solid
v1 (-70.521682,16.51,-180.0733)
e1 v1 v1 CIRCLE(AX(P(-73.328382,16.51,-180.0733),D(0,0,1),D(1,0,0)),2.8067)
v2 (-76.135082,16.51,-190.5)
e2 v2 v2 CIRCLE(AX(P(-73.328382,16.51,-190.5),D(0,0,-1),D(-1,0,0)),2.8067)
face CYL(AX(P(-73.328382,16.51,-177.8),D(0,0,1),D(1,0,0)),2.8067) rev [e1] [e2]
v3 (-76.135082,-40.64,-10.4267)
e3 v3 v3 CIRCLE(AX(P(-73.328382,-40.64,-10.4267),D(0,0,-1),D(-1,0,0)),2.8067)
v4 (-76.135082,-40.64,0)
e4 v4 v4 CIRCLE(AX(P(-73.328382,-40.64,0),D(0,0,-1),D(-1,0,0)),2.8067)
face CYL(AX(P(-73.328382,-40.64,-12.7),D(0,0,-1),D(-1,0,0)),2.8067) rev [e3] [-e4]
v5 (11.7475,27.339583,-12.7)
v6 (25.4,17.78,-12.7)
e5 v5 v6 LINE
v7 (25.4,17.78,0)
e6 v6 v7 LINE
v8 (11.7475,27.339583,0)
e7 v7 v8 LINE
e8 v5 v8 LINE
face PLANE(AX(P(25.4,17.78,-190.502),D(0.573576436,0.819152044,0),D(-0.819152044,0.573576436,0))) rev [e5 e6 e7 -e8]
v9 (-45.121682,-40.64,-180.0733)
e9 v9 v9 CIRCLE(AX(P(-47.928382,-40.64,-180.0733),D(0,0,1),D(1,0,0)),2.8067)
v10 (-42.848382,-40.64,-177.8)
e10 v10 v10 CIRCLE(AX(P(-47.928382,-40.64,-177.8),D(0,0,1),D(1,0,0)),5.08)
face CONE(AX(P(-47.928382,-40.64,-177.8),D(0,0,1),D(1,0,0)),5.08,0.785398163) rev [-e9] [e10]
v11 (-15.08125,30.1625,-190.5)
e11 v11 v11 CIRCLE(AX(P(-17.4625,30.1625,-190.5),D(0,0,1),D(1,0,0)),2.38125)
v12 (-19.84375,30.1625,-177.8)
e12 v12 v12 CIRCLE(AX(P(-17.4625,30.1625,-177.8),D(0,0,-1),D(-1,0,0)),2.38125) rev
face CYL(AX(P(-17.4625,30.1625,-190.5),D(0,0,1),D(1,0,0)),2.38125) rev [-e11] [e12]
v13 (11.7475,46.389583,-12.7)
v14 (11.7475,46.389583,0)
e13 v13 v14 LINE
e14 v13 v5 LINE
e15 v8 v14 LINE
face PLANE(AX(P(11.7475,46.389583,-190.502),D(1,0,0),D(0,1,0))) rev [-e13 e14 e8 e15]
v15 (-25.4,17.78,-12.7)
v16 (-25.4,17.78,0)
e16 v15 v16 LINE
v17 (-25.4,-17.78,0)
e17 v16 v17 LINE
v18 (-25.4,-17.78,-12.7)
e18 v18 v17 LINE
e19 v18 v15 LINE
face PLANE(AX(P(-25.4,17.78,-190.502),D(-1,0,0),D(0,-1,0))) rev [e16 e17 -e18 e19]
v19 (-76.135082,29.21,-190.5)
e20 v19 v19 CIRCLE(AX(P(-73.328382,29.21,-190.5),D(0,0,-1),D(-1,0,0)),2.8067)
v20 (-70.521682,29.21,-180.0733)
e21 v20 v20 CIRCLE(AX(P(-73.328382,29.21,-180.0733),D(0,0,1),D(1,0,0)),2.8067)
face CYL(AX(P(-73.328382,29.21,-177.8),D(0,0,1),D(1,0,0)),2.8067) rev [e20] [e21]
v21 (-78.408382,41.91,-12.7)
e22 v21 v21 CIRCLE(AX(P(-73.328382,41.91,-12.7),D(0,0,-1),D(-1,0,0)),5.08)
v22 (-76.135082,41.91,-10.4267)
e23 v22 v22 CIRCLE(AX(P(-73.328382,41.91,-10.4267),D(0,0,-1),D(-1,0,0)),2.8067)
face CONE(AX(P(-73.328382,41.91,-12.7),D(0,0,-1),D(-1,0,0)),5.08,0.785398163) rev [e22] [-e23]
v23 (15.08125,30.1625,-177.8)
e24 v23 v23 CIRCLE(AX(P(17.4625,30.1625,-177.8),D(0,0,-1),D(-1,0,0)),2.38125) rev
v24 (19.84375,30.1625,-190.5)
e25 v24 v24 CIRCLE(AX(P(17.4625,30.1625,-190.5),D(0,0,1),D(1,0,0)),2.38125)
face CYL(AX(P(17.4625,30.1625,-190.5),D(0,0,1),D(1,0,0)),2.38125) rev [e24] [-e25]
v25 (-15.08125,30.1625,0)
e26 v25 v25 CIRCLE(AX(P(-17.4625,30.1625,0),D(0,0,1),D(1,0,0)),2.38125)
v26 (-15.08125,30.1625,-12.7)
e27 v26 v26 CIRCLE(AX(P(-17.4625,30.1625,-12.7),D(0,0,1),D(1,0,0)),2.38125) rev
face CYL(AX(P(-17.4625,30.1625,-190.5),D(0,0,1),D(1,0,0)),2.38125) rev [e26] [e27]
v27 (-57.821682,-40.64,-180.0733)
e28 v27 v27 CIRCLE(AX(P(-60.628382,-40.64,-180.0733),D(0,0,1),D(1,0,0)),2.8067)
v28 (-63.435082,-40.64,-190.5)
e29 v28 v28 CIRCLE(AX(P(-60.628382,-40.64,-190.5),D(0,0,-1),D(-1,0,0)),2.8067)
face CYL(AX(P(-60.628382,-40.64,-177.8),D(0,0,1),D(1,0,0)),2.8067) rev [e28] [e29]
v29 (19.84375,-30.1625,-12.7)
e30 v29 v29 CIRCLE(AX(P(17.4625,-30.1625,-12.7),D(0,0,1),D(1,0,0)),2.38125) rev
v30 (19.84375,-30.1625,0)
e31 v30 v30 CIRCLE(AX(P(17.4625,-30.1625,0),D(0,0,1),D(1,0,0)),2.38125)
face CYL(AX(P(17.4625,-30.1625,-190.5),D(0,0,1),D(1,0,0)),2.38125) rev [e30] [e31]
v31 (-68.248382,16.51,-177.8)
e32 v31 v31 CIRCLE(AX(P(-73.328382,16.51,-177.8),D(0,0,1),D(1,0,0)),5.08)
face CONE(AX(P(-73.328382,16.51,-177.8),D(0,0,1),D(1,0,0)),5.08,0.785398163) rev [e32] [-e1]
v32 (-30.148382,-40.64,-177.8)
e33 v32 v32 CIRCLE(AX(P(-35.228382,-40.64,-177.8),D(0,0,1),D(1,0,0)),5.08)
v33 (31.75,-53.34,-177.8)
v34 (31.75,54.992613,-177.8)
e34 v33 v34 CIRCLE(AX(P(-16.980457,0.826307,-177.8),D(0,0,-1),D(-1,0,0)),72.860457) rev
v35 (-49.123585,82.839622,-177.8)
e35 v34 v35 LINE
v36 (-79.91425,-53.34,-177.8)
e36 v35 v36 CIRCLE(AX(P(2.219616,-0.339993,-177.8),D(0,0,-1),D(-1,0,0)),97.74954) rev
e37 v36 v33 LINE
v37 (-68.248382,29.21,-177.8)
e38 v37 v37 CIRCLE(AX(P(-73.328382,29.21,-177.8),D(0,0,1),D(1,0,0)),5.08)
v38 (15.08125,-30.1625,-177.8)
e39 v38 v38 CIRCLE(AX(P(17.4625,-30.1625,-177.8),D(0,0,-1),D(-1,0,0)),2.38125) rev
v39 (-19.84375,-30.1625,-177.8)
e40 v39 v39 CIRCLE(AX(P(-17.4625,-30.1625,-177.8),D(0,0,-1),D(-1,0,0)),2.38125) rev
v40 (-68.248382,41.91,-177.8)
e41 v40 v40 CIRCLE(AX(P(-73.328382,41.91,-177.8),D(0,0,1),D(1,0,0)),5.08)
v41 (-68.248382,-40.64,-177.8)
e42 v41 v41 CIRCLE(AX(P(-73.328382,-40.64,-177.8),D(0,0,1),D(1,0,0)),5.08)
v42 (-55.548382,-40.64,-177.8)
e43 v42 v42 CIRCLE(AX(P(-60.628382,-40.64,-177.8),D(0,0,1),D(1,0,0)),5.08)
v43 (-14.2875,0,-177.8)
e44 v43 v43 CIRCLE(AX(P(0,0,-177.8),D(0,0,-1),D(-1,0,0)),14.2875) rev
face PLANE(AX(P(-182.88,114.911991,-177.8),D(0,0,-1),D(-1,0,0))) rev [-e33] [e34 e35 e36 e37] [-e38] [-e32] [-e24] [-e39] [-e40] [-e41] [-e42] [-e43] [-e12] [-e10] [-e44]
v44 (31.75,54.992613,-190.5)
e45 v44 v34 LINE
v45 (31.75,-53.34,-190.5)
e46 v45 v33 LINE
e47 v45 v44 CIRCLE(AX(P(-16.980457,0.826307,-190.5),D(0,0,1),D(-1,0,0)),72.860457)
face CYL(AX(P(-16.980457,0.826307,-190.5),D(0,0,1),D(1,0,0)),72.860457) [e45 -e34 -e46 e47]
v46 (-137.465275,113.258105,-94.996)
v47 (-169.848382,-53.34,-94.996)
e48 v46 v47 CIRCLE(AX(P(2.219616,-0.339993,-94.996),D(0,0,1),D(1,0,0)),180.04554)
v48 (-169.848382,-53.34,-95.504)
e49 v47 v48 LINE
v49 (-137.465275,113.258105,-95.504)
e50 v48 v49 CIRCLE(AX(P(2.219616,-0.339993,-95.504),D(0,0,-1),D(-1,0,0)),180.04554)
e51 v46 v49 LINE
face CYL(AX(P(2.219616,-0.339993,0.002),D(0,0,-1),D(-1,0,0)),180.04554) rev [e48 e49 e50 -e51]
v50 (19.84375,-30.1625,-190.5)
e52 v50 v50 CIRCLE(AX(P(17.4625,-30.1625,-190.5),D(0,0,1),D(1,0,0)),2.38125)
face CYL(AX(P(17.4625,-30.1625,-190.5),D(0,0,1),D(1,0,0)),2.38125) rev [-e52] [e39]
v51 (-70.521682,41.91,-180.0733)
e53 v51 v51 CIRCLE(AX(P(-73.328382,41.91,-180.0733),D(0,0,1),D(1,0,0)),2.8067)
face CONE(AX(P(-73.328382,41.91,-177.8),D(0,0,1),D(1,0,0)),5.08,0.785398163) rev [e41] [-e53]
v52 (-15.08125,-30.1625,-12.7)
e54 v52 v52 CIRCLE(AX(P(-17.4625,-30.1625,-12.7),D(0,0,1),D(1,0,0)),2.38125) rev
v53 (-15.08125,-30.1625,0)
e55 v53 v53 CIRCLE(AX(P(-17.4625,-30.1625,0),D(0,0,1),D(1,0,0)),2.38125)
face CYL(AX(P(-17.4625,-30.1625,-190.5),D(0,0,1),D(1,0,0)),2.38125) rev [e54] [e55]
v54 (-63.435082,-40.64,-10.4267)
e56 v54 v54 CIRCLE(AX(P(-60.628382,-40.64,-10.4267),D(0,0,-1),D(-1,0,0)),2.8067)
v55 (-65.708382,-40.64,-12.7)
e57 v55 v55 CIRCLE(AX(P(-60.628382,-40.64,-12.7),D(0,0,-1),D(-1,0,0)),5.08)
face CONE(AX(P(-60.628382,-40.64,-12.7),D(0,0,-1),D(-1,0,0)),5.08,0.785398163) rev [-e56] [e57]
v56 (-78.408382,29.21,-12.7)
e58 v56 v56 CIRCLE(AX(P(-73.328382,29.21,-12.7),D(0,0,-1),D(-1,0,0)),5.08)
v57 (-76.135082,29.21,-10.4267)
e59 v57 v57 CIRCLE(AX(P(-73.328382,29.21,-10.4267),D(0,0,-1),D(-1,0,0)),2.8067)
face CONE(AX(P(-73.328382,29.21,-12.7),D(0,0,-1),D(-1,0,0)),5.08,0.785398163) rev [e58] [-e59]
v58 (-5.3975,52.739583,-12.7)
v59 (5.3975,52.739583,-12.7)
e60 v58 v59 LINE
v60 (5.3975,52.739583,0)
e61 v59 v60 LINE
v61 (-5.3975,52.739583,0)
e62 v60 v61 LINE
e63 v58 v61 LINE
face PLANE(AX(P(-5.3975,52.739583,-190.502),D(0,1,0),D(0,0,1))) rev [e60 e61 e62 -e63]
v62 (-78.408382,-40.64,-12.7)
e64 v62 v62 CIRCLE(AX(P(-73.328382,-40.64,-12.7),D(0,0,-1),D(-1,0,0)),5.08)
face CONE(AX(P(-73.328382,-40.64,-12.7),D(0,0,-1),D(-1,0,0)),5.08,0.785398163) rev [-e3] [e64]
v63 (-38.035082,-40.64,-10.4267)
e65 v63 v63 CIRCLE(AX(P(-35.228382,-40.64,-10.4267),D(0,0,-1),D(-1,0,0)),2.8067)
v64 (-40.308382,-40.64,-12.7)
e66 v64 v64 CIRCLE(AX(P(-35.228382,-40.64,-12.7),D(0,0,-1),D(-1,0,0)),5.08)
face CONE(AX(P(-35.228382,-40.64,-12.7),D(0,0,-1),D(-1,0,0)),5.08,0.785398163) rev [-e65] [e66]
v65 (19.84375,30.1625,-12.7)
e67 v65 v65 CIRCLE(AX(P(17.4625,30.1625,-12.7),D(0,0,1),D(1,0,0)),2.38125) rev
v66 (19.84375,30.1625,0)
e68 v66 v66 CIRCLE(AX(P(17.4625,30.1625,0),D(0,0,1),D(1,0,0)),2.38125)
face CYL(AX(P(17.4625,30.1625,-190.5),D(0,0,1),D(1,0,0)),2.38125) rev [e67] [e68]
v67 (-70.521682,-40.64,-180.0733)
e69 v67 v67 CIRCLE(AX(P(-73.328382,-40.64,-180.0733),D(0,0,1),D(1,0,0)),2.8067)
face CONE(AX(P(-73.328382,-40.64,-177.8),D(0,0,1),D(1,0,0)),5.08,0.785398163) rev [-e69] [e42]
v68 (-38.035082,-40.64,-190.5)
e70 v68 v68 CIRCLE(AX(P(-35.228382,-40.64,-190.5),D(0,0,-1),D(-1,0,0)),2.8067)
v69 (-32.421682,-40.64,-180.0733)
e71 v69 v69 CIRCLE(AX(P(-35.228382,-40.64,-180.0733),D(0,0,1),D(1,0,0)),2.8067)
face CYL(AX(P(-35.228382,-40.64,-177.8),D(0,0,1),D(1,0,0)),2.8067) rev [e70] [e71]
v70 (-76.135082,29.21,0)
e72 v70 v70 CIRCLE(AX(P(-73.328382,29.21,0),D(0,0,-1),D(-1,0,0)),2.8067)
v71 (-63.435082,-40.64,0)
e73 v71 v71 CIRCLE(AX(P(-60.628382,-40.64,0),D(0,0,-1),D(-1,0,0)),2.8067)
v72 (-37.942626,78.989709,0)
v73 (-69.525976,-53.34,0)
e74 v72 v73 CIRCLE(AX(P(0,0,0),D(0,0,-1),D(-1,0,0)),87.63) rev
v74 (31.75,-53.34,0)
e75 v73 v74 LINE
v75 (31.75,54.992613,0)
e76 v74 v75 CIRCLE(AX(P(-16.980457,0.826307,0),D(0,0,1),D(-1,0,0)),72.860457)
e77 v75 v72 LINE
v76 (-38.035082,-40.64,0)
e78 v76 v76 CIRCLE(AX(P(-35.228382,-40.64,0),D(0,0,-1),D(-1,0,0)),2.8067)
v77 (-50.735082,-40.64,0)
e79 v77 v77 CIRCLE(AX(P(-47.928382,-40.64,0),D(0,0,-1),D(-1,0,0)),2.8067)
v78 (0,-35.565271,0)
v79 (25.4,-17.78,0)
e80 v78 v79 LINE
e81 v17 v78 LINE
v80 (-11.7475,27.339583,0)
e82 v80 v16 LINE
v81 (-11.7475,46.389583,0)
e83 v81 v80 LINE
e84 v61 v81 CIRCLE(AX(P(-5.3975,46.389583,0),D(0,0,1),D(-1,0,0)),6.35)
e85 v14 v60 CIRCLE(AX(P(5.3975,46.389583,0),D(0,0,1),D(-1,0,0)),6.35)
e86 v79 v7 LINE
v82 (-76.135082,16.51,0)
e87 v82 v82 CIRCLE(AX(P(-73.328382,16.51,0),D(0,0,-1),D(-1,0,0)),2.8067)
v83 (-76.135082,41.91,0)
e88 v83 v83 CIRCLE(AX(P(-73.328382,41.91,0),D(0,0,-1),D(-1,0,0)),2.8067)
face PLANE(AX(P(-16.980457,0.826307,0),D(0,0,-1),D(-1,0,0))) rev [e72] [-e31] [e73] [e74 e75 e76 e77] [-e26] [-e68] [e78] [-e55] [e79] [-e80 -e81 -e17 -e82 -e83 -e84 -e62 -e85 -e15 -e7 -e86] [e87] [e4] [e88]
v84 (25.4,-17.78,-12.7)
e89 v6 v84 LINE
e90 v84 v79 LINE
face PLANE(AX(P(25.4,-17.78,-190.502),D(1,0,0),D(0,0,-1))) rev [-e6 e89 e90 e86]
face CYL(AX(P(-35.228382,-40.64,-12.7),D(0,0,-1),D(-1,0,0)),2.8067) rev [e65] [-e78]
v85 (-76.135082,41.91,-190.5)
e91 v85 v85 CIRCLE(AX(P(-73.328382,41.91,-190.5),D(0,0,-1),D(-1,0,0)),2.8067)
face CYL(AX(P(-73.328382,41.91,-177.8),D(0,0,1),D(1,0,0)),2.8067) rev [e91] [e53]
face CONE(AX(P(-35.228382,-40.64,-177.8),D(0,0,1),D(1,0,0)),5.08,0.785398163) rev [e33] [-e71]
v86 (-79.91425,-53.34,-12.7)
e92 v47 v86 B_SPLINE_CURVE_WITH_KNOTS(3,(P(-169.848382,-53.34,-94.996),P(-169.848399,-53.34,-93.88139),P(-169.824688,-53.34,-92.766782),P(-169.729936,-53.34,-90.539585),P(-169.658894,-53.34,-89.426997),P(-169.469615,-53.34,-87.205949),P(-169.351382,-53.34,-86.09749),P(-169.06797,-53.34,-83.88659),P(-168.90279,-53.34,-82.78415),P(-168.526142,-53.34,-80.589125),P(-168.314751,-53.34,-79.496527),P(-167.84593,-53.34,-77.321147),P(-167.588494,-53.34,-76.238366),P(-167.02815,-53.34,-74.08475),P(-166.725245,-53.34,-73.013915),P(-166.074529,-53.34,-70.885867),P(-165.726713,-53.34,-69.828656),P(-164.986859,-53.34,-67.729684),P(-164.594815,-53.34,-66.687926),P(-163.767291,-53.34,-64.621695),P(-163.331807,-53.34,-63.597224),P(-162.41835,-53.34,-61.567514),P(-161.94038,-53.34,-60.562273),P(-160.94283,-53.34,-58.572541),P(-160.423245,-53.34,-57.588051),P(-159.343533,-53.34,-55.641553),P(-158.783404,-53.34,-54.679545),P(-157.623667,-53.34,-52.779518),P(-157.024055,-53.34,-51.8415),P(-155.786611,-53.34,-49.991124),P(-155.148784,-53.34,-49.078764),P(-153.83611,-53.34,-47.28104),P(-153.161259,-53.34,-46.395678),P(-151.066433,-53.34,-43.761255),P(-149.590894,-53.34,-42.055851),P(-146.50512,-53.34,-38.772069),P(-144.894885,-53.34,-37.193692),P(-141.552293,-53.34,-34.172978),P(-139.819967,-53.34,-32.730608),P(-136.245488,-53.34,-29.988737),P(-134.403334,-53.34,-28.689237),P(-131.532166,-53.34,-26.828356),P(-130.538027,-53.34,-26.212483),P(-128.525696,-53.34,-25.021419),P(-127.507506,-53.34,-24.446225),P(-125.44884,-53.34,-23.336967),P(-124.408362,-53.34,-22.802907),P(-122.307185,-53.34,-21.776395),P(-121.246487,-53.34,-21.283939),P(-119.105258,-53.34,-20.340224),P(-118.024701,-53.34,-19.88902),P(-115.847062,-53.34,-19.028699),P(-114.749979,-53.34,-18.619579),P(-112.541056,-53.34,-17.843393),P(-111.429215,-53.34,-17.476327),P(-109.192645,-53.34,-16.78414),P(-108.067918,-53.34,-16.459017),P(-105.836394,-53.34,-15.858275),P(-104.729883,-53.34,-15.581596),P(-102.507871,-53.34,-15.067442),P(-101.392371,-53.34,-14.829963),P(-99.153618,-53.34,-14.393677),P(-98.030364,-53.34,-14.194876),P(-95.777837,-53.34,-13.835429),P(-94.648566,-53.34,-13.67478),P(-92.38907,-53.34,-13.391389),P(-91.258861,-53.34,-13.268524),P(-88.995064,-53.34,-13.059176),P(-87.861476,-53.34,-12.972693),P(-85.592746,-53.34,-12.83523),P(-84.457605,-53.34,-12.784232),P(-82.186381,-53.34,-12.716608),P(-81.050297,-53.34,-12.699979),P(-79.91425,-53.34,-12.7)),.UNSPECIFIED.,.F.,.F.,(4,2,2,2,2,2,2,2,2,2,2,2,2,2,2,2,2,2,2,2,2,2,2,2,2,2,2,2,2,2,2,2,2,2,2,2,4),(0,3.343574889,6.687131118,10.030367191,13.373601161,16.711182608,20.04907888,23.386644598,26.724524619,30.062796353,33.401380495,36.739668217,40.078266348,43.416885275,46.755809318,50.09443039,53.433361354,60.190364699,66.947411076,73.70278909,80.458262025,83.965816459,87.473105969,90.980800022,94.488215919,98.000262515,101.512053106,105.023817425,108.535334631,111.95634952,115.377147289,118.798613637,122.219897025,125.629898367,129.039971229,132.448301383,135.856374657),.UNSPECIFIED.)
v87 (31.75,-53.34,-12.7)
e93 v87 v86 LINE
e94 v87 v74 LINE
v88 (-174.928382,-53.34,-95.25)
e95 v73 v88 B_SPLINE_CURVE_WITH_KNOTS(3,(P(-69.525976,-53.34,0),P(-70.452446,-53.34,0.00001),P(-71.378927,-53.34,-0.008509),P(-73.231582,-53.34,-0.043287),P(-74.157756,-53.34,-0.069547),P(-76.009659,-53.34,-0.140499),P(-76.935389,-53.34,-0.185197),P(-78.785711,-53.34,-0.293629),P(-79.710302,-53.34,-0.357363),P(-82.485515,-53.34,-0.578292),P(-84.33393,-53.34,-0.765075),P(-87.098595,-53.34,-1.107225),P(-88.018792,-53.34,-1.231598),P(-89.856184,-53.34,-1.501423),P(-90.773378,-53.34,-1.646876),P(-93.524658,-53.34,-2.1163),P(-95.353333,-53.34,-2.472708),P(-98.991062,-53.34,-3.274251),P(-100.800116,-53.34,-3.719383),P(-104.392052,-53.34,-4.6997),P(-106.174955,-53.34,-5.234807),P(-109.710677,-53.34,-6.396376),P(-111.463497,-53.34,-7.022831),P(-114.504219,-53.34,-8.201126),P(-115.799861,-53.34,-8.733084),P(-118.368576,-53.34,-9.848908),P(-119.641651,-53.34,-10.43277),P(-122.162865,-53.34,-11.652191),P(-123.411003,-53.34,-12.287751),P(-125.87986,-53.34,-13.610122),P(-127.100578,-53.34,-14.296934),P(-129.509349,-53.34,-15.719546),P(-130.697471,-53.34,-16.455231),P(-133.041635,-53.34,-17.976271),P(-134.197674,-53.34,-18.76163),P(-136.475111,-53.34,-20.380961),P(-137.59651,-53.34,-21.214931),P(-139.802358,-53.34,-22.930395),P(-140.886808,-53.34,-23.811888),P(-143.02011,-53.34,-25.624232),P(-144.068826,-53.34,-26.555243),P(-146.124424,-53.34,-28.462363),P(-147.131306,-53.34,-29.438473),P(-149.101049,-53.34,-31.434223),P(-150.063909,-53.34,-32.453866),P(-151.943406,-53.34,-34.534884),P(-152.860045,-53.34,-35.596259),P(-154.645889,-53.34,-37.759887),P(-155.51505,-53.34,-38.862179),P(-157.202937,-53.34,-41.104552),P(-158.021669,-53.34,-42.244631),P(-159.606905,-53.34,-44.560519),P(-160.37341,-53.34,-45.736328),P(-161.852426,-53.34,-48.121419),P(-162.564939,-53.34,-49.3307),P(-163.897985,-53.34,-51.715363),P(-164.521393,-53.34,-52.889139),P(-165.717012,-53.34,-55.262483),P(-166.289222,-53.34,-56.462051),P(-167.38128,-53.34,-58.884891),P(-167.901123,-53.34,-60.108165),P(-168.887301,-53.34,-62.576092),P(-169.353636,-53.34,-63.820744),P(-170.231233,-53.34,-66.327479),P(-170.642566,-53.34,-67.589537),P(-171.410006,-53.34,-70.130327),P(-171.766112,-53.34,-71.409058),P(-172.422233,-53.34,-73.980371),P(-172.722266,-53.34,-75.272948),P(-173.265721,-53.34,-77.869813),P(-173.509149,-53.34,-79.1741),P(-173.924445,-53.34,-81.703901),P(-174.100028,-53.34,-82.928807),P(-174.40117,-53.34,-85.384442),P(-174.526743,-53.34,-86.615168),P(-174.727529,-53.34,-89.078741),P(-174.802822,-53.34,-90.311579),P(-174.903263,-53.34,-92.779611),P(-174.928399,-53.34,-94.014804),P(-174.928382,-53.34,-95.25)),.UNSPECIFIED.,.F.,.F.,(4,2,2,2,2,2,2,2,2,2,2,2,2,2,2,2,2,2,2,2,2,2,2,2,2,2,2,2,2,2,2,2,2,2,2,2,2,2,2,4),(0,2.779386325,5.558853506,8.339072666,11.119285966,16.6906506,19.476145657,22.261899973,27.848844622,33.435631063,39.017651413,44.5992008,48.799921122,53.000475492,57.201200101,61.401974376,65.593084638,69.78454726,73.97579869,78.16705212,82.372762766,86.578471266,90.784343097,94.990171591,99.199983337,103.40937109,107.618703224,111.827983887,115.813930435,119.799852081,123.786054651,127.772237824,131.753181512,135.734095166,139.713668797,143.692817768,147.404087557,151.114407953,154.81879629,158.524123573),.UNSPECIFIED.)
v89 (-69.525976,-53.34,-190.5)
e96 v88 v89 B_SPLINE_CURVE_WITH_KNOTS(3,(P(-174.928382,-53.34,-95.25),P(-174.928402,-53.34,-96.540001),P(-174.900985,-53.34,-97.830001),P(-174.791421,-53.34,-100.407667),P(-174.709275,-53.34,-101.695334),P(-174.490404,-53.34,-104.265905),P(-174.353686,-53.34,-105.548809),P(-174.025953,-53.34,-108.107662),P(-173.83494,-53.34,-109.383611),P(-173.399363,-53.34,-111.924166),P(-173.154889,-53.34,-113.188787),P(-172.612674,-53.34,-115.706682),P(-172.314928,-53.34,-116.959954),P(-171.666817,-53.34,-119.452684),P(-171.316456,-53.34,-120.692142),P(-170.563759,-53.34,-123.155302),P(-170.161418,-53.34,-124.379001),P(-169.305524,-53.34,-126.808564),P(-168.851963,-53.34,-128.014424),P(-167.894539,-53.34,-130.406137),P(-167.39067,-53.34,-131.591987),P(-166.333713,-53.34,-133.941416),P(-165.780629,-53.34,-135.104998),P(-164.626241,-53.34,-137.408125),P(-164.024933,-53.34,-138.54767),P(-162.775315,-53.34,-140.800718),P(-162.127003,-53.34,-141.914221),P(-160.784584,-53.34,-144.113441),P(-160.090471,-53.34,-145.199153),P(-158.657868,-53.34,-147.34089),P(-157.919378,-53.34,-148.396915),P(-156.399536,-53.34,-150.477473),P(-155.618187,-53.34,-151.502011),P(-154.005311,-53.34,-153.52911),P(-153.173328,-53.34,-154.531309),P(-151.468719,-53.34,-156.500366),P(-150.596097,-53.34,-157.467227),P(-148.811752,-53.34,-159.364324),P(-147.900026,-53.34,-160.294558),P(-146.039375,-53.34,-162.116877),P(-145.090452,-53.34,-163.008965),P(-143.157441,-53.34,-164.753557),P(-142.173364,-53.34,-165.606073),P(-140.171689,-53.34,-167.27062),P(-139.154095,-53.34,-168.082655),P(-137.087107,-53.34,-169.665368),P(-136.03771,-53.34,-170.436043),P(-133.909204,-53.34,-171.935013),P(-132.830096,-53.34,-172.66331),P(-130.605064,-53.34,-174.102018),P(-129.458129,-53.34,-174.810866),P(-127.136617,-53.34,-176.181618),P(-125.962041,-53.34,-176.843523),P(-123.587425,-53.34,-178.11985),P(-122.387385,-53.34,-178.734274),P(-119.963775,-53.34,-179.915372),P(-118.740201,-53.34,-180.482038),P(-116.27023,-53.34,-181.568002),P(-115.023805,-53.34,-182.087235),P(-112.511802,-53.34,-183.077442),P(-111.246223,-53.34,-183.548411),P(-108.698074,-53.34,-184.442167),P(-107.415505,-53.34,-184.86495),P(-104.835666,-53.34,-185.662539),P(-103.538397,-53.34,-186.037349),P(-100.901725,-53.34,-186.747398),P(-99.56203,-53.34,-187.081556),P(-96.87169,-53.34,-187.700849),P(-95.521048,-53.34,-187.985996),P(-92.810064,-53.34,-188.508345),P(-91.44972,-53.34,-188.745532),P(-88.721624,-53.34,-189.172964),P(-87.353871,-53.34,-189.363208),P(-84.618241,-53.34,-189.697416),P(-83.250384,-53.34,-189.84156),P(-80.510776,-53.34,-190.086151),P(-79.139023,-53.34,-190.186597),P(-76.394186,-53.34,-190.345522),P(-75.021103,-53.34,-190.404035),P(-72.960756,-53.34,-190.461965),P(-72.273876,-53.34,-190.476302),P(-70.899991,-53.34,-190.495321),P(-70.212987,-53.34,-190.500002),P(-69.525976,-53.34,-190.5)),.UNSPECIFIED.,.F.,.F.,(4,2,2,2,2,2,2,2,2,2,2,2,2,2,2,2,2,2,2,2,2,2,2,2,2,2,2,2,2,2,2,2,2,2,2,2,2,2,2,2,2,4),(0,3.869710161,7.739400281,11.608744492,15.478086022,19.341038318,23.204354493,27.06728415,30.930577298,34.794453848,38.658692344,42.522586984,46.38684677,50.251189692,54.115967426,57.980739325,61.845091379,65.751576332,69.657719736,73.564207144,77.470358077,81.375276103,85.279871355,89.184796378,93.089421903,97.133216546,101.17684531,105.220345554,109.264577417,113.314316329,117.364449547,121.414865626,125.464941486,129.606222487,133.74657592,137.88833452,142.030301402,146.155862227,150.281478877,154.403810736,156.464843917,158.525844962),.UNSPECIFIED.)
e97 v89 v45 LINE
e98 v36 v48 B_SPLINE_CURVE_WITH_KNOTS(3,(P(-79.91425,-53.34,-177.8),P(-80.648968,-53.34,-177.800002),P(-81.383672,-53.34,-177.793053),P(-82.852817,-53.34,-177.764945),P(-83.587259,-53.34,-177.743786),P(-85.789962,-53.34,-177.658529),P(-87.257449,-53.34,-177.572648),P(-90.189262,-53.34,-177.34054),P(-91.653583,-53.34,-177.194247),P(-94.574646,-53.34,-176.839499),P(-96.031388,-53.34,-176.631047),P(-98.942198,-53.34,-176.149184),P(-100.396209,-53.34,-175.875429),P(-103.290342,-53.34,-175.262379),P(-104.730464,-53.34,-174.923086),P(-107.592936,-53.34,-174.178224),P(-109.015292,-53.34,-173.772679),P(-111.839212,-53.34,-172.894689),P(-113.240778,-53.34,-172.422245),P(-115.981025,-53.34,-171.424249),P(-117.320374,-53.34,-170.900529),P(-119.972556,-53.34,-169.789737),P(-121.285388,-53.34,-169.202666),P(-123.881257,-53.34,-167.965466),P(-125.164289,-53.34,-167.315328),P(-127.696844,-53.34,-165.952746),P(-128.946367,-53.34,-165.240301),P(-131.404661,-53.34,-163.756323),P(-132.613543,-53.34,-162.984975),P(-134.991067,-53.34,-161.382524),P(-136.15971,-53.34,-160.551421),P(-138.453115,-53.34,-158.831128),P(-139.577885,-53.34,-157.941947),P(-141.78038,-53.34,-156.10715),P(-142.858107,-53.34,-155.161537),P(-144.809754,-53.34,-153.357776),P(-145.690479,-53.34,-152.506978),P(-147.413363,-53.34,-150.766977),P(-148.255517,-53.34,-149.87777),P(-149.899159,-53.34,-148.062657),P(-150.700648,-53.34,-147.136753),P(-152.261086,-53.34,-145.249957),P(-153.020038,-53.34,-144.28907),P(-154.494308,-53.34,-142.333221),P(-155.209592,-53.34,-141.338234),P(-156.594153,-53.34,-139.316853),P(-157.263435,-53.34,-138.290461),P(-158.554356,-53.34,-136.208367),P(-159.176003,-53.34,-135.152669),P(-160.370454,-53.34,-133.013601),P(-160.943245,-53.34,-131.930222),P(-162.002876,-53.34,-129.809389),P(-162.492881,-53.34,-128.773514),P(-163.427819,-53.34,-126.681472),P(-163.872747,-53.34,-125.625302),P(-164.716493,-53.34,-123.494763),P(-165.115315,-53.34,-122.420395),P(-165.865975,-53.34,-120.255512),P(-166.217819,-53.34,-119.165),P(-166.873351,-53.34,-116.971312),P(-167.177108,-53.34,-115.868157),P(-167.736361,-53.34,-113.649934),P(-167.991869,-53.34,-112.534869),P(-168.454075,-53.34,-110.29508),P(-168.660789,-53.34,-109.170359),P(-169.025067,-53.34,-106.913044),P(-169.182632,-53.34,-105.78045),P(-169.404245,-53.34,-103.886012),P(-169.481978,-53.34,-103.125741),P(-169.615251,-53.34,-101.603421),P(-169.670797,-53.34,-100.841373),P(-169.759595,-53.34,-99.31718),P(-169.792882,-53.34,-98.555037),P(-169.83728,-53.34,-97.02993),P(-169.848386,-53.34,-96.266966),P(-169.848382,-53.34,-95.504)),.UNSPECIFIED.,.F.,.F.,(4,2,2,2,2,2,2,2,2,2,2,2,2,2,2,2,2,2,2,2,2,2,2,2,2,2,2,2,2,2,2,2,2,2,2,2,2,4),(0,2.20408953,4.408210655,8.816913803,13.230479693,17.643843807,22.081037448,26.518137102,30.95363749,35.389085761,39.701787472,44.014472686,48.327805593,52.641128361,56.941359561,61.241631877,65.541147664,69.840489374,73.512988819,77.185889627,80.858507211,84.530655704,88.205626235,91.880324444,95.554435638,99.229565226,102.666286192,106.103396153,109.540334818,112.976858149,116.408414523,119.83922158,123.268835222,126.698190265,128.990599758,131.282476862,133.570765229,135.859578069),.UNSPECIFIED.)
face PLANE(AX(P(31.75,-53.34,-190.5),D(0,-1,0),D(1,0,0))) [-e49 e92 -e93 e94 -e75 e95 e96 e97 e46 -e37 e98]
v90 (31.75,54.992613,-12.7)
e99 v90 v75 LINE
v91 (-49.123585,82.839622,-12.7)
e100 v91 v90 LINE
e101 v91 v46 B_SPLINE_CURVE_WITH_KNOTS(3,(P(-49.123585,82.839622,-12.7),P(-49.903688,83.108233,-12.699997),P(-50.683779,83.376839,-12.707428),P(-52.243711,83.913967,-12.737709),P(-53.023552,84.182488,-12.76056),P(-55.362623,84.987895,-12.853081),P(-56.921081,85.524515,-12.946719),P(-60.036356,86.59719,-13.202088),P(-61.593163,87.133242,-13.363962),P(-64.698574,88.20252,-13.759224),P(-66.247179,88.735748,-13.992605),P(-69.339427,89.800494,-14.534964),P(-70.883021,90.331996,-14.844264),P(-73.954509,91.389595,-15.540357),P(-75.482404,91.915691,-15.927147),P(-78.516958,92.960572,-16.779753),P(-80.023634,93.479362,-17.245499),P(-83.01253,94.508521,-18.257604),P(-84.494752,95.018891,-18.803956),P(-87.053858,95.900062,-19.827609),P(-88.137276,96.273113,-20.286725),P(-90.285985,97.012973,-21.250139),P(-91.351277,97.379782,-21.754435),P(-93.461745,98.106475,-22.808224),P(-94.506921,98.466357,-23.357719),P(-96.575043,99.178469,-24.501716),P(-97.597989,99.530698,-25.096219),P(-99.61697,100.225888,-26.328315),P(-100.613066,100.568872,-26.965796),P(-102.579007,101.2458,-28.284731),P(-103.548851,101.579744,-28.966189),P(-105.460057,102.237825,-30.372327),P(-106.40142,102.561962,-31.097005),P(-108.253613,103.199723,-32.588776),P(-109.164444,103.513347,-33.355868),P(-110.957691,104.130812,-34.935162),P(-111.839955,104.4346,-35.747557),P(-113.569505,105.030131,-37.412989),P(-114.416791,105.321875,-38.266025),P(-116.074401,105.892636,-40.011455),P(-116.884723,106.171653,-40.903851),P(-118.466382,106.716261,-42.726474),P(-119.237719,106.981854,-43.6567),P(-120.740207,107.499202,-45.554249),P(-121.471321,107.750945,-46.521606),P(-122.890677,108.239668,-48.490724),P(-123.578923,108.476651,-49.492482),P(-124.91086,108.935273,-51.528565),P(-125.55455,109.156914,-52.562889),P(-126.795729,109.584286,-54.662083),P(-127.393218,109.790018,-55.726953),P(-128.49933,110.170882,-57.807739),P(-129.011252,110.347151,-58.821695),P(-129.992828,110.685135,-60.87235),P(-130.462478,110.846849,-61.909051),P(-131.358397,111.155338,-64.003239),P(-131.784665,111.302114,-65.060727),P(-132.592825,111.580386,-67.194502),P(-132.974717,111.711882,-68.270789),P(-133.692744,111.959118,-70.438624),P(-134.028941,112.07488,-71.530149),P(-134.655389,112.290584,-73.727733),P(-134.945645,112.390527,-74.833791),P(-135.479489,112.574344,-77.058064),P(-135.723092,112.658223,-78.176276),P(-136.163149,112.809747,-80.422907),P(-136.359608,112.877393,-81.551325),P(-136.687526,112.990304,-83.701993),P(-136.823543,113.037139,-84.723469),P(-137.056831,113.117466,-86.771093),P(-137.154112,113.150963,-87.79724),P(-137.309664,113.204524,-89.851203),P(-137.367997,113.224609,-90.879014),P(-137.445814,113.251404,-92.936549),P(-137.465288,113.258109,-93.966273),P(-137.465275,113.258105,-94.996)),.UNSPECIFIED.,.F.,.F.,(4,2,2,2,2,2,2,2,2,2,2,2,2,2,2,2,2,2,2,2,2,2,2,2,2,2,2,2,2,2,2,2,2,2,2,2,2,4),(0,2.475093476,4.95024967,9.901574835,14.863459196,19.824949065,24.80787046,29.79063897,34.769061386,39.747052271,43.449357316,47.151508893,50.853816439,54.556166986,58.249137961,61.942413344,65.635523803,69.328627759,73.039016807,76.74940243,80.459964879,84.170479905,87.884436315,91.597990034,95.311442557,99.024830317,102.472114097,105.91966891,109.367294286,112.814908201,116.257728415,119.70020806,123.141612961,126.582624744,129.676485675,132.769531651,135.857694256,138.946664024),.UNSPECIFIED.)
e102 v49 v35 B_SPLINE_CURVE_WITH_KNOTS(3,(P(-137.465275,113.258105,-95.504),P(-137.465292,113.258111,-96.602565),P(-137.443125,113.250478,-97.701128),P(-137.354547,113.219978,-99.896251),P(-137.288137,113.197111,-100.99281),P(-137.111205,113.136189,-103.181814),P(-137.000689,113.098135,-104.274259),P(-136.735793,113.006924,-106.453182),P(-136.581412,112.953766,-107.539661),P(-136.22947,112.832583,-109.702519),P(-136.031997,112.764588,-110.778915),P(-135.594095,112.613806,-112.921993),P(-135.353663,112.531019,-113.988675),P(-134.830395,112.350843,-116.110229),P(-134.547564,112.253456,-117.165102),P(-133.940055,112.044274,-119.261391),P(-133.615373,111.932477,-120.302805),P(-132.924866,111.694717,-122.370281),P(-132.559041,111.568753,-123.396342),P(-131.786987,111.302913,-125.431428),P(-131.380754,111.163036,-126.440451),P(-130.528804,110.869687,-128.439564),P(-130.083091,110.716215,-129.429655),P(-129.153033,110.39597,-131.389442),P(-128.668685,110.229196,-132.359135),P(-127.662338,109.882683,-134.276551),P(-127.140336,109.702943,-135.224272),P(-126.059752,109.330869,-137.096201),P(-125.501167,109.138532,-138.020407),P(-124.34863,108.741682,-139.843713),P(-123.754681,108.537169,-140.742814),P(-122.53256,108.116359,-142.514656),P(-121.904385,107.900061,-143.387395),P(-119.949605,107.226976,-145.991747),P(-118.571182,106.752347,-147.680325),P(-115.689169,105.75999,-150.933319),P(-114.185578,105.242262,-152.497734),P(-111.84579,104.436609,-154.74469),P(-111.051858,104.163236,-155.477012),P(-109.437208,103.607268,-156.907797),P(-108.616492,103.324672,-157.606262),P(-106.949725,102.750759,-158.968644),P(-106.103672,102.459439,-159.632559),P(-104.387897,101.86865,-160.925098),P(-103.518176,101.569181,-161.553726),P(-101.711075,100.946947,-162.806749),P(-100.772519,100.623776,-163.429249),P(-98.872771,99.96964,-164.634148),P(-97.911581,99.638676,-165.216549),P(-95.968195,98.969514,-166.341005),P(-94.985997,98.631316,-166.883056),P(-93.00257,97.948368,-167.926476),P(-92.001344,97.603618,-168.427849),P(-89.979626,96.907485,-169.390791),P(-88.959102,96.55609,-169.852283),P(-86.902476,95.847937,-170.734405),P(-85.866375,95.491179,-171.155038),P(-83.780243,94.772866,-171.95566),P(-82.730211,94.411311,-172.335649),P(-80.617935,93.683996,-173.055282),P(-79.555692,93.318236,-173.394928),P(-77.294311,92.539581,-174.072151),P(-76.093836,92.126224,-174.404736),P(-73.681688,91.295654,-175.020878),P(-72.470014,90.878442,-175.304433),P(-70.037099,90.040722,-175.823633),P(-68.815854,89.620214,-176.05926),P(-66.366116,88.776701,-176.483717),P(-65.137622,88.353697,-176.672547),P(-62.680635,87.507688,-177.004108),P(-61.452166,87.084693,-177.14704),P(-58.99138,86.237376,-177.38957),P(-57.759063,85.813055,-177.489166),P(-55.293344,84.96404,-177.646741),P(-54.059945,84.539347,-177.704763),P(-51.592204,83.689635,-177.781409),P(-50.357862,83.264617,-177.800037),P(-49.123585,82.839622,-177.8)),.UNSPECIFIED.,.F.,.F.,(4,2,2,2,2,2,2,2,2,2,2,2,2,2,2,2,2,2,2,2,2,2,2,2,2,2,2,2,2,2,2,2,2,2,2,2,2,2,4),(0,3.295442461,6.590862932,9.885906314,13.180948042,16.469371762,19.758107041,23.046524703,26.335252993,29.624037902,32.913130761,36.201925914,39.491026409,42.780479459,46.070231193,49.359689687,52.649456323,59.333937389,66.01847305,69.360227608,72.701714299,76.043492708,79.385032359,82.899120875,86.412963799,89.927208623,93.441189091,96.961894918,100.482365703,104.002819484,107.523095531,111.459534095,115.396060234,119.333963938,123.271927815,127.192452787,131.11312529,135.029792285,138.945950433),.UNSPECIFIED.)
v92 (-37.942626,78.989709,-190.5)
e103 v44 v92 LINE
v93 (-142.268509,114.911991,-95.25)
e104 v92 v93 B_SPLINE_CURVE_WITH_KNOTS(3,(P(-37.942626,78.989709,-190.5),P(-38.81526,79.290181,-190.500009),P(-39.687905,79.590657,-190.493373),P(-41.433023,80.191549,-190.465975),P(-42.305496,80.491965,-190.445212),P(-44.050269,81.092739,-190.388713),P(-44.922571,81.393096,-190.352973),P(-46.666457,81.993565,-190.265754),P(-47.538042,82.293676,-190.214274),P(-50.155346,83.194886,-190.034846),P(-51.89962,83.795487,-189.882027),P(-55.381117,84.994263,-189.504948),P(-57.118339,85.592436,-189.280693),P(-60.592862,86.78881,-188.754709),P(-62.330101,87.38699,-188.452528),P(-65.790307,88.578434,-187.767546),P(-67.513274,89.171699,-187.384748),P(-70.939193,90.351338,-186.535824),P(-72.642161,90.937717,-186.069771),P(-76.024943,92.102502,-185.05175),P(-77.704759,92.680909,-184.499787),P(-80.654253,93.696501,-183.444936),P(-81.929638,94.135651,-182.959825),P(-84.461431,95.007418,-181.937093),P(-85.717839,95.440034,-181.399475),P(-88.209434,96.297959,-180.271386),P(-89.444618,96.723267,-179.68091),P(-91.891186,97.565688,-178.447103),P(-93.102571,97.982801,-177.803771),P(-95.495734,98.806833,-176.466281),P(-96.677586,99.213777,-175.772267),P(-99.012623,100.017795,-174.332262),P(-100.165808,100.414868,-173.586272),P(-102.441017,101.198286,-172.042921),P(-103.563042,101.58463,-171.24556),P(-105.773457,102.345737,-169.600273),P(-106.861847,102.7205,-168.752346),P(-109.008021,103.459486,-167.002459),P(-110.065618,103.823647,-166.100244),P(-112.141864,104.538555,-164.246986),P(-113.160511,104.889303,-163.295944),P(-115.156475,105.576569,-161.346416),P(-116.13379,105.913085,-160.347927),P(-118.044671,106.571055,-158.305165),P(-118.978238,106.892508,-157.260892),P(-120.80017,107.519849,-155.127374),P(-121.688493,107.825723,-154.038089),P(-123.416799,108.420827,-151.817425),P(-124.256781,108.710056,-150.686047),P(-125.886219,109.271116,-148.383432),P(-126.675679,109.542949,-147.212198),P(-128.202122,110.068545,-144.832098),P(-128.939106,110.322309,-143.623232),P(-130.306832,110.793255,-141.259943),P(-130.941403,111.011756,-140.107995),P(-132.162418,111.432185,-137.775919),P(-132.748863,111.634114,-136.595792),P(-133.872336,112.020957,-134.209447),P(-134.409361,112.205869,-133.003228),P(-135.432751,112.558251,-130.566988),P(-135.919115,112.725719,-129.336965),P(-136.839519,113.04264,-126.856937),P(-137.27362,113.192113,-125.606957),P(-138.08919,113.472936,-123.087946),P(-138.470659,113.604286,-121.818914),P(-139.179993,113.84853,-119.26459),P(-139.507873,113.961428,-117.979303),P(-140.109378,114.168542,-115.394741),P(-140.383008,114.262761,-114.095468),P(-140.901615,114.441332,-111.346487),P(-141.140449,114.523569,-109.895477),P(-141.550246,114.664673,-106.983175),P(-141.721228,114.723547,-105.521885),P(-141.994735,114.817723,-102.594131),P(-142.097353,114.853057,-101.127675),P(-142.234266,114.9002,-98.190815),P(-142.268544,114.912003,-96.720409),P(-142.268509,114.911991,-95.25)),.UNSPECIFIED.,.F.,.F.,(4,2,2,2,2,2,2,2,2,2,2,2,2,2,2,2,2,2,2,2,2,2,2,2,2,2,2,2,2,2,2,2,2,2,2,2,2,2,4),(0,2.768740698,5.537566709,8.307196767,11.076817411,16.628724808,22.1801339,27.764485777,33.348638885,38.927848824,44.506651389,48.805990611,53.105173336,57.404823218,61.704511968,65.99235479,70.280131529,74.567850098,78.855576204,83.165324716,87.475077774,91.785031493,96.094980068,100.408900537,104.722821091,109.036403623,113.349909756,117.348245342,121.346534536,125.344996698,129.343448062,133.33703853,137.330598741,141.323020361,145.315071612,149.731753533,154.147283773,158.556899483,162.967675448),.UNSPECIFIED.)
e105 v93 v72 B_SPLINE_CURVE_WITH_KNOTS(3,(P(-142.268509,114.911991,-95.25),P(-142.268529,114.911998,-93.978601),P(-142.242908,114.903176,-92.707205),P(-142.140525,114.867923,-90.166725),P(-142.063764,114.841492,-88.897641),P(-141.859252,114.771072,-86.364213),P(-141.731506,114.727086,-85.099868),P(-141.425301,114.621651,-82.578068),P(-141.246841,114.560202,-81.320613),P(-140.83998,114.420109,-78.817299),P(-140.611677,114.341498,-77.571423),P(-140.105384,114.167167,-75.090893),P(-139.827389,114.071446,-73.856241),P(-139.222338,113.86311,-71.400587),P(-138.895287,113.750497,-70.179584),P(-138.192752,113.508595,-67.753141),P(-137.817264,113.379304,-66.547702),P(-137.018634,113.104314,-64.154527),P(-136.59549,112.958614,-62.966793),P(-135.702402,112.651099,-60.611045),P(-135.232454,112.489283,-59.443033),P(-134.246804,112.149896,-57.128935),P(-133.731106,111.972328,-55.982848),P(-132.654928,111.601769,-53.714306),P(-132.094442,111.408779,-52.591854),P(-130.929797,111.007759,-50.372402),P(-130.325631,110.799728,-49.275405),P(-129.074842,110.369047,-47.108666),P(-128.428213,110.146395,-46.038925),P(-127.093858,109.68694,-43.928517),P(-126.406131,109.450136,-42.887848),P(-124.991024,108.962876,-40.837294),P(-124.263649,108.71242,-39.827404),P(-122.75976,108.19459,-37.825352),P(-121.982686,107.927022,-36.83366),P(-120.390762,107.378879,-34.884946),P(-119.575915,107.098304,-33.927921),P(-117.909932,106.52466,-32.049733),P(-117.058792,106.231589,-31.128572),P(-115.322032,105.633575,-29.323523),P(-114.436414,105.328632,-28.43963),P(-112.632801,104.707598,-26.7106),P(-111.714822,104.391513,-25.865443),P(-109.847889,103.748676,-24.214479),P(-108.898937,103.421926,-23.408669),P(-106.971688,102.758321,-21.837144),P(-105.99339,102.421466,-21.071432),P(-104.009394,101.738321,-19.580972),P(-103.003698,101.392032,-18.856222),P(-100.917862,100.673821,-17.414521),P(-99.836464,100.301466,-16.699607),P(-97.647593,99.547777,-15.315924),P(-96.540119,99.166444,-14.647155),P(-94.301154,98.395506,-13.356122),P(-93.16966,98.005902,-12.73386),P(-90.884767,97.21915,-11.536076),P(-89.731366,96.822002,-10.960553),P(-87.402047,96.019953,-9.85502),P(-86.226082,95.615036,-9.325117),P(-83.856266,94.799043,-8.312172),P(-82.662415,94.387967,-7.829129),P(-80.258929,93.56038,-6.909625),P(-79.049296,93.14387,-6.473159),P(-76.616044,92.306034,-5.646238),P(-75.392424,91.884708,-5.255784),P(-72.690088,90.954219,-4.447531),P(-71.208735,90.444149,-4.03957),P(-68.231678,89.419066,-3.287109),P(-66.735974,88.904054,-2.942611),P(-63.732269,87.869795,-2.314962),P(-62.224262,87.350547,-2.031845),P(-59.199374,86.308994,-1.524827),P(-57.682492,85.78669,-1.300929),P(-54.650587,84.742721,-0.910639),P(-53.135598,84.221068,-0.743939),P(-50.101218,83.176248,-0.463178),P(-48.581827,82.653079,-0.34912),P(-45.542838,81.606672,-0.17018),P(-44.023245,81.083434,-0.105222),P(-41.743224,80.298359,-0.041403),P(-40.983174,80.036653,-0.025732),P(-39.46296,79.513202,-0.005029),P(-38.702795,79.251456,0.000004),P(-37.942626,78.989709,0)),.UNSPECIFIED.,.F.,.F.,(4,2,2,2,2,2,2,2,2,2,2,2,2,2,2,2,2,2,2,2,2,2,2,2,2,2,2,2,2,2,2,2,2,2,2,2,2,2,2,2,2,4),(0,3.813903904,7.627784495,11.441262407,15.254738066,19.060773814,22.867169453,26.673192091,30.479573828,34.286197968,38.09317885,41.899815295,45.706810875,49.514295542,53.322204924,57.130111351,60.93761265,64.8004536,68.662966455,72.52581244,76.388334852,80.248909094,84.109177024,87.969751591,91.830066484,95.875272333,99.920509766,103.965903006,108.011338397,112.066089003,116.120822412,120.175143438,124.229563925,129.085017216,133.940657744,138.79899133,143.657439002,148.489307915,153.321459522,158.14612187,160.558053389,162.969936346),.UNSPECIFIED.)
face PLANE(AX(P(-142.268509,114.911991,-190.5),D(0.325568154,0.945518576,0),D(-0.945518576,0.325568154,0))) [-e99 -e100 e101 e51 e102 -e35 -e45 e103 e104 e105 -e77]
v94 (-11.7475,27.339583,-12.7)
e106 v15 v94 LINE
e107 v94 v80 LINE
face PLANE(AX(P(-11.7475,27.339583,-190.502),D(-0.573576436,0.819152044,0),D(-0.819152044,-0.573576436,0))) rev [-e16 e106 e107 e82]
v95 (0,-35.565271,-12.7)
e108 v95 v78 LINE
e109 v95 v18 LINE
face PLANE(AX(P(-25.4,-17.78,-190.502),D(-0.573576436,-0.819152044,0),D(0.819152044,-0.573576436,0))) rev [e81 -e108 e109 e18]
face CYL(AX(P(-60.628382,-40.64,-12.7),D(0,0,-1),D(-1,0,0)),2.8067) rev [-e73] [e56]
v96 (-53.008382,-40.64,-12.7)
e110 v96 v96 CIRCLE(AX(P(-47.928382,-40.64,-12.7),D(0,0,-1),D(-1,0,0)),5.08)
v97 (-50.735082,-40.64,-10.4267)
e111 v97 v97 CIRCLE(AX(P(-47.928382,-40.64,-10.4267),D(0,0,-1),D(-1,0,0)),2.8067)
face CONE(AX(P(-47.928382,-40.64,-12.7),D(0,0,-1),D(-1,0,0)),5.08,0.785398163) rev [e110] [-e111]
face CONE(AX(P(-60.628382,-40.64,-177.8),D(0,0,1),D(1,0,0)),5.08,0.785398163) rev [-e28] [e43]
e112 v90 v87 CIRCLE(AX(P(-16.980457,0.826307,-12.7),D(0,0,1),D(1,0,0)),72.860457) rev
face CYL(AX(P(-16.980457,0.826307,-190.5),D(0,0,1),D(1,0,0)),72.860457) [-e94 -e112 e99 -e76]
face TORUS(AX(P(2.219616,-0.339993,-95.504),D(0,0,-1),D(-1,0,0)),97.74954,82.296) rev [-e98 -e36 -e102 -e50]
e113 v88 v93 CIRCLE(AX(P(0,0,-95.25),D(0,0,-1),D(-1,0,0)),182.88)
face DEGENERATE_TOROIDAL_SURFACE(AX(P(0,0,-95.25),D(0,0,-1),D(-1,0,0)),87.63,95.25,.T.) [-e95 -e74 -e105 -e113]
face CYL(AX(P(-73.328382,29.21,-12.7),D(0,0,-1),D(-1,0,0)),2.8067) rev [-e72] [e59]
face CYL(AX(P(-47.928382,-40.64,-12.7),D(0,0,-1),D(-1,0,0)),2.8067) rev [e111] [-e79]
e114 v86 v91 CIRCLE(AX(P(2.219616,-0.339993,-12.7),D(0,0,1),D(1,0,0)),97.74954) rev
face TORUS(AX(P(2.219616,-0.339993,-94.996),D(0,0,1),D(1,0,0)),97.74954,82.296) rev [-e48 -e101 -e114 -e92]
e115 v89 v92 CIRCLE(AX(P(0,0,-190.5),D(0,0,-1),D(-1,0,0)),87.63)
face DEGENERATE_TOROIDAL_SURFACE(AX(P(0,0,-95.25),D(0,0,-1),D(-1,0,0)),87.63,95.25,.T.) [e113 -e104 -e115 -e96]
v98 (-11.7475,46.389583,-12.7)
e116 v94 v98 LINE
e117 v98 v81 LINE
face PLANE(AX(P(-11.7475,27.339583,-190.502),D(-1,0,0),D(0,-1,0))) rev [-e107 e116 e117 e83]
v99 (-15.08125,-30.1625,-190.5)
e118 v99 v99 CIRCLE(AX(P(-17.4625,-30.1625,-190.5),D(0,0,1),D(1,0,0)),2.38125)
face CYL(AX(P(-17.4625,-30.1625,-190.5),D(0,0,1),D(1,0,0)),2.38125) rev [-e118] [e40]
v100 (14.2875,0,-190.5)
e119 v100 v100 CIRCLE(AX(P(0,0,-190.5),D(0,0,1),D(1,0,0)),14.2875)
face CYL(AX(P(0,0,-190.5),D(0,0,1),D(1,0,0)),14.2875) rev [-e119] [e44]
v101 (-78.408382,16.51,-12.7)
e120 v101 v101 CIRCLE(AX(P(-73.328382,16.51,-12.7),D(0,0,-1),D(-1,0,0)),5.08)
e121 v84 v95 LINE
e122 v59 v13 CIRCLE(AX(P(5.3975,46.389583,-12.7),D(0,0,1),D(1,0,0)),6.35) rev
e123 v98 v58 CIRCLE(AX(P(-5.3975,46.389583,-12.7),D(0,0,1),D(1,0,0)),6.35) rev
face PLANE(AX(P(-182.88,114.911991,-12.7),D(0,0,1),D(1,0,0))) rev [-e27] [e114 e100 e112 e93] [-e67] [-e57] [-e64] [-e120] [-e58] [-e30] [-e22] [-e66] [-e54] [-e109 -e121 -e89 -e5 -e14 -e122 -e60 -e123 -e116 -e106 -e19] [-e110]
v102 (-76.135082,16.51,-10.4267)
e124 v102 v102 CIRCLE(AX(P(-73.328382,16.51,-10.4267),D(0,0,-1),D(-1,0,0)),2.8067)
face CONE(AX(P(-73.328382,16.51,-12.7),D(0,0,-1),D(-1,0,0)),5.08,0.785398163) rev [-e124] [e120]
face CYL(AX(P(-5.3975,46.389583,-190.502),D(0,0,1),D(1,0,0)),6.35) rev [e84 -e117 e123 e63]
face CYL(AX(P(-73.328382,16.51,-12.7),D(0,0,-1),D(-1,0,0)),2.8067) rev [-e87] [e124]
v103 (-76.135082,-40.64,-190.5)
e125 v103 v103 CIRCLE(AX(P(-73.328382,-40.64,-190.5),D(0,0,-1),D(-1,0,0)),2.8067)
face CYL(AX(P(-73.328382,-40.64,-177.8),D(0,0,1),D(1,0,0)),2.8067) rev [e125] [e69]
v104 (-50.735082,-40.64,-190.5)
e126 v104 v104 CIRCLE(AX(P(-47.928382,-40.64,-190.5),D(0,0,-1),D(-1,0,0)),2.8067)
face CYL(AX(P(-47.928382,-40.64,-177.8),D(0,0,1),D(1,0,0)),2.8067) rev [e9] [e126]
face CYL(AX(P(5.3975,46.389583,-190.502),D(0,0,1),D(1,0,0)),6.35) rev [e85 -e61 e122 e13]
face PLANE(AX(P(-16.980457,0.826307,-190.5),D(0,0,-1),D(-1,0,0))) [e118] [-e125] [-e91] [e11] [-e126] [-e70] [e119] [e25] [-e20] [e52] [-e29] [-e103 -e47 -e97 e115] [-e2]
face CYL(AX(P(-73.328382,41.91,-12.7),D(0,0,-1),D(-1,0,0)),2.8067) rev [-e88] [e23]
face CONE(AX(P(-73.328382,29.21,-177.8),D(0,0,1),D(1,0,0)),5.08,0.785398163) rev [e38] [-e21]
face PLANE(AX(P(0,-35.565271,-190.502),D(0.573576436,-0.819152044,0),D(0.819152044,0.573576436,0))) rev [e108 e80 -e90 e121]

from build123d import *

# Parameters (mm, degrees)
SKETCH1_R                                          = 14.287500000000003
SKETCH1_R_2                                        = 2.3812500000000005
SKETCH1_R_3                                        = 2.3812500000000023
BOSS_EXTRUDE1_DEPTH                                = 190.5
CUT_EXTRUDE1_DEPTH                                 = 314.11990818452256
BOSS_EXTRUDE2_DEPTH                                = 165.1
CUT_EXTRUDE3_REACH                                 = 289.993
FILLET2_R                                          = 82.296
FILLET3_R                                          = 95.25
CSK_FOR_10_FLAT_HEAD_MACHINE_SCREW_100_D           = 5.6134
CSK_FOR_10_FLAT_HEAD_MACHINE_SCREW_100_DEPTH       = 21.30479447
CSK_FOR_10_FLAT_HEAD_MACHINE_SCREW_100_CSINK_D     = 10.16
CSK_FOR_10_FLAT_HEAD_MACHINE_SCREW_100_CSINK_ANGLE = 90


with BuildPart() as part:
    # Sketch1 → Boss-Extrude1 (new body)
    with BuildSketch(Plane.XY):
        with BuildLine():
            Line((31.75000000000027, -53.33999999999999), (-174.9283819167147, -53.33999999999997))
            ThreePointArc((-174.9283819167147, -53.33999999999997), (-179.52896718087996, 34.848878647189125), (-142.26850918824246, 114.91199107732386))
            Line((-142.26850918824246, 114.91199107732386), (31.750000000000263, 54.99261314031172))
            ThreePointArc((31.750000000000263, 54.99261314031172), (55.88000000000002, 0.8263065701558671), (31.75000000000027, -53.33999999999999))
        make_face()
        Circle(SKETCH1_R, mode=Mode.SUBTRACT)
        with Locations((-17.4625, 30.162499999999998)):
            Circle(SKETCH1_R_2, mode=Mode.SUBTRACT)
        with Locations((17.4625, 30.162499999999998)):
            Circle(SKETCH1_R_3, mode=Mode.SUBTRACT)
        with Locations((17.4625, -30.162499999999998)):
            Circle(SKETCH1_R_3, mode=Mode.SUBTRACT)
        with Locations((-17.462499999999995, -30.162499999999998)):
            Circle(SKETCH1_R_2, mode=Mode.SUBTRACT)
    extrude(amount=-BOSS_EXTRUDE1_DEPTH)

    # Sketch2 → Cut-Extrude1 (cut, through all)
    with BuildSketch(Plane.XZ.offset(53.33999999999999)):
        Polygon((-182.87999999999997, -12.7), (55.88000000000002, -12.699999999999989), (55.88000000000004, -177.79999999999998), (-182.87999999999997, -177.79999999999998), align=None)
    extrude(amount=-CUT_EXTRUDE1_DEPTH, mode=Mode.SUBTRACT)


with BuildPart() as cut_extrude1_piece_1:
    # of the separate pieces the step leaves, piece 1, a body of its own (cut_extrude1_pieces)
    add(part.part.solids().sort_by_distance((31.75, 54.99261314, -177.8))[0])



with BuildPart() as cut_extrude1_piece_2:
    # of the separate pieces the step leaves, piece 2, a body of its own (cut_extrude1_pieces)
    add(part.part.solids().sort_by_distance((-142.268509188, 114.911991077, 0))[0])


with BuildPart() as cut_extrude1_piece_1_1:
    add(cut_extrude1_piece_1.part)

    add(cut_extrude1_piece_2.part)  # Boss-Extrude2 merges Cut-Extrude1 piece 2
    # Sketch3 → Boss-Extrude2 (add)
    with BuildSketch(Plane.XY.offset(-177.79999999999998)):
        with BuildLine():
            Line((-142.26850918824255, 114.9119910773238), (-137.46527482419802, 113.25810485268146))
            ThreePointArc((-137.46527482419802, 113.25810485268146), (-174.51803717575487, 34.01402507695267), (-169.84838191671497, -53.33999999999914))
            Line((-169.84838191671497, -53.33999999999914), (-174.92838191671498, -53.339999999999144))
            ThreePointArc((-174.92838191671498, -53.339999999999144), (-179.52896718087993, 34.84887864718949), (-142.26850918824255, 114.9119910773238))
        make_face()
    extrude(amount=BOSS_EXTRUDE2_DEPTH)

    # Sketch5 → Cut-Extrude3 (cut, up to next)
    with BuildSketch(Plane.XY, mode=Mode.PRIVATE) as cut_extrude3_sk1:
        with BuildLine():
            Line((-25.399999999999995, 17.779999999999998), (-25.4, -17.779999999999998))
            Line((-25.4, -17.779999999999998), (9.71e-15, -35.56527147052652))
            Line((9.71e-15, -35.56527147052652), (25.400000000000002, -17.78))
            Line((25.400000000000002, -17.78), (25.400000000000002, 17.779999999999998))
            Line((25.400000000000002, 17.779999999999998), (11.747499999999985, 27.33958341540801))
            Line((11.747499999999985, 27.33958341540801), (11.747499999999983, 46.38958341540796))
            ThreePointArc((11.747499999999983, 46.38958341540796), (9.88762806053456, 50.879711475942585), (5.397499999999937, 52.739583415408006))
            Line((5.397499999999937, 52.739583415408006), (-5.397499999999977, 52.739583415408006))
            ThreePointArc((-5.397499999999977, 52.739583415408006), (-9.887628060534599, 50.879711475942585), (-11.747500000000022, 46.38958341540796))
            Line((-11.747500000000022, 46.38958341540796), (-11.74750000000002, 27.33958341540801))
            Line((-11.74750000000002, 27.33958341540801), (-25.399999999999995, 17.779999999999998))
        make_face()
    cut_extrude3_tool1 = extrude(cut_extrude3_sk1.sketch, amount=-CUT_EXTRUDE3_REACH, mode=Mode.PRIVATE) & cut_extrude1_piece_1_1.part
    add(cut_extrude3_tool1.solids().sort_by_distance((0, 6.295319, 0))[0], mode=Mode.SUBTRACT)

    # Fillet2
    fillet2_edges = [cut_extrude1_piece_1_1.edges().sort_by_distance(p)[0] for p in [
        (-174.51803717575484, 34.014025076952706, -12.699999999999989),
        (-174.51803717575484, 34.014025076952706, -177.79999999999998),
    ]]
    fillet(fillet2_edges, radius=FILLET2_R)

    # Fillet3
    fillet3_edges = [cut_extrude1_piece_1_1.edges().sort_by_distance(p)[0] for p in [
        (-179.52896718087993, 34.848878647189096, -190.5),
        (-179.52896718087993, 34.848878647189096, 0),
    ]]
    fillet(fillet3_edges, radius=FILLET3_R - 0.0001)  # a hair under: the kernel refuses the full size

    # CSK for #10 Flat Head Machine Screw (100)12
    with Locations(Plane(origin=(5.5e-16, 0, -12.69999999999999), x_dir=(-1, 0, 0), z_dir=(0, 0, -1))):
        with Locations((35.228381917, -40.64), (73.328381917, 29.21), (73.328381917, 41.91), (73.328381917, 16.51), (60.628381917, -40.64), (73.328381917, -40.64), (47.928381917, -40.64)):
            csk_for_10_flat_head_machine_screw_100 = CounterSinkHole(CSK_FOR_10_FLAT_HEAD_MACHINE_SCREW_100_D / 2, CSK_FOR_10_FLAT_HEAD_MACHINE_SCREW_100_CSINK_D / 2, depth=CSK_FOR_10_FLAT_HEAD_MACHINE_SCREW_100_DEPTH, counter_sink_angle=CSK_FOR_10_FLAT_HEAD_MACHINE_SCREW_100_CSINK_ANGLE)

    # Mirror1: CSK for #10 Flat Head Machine Screw (100)12 across plane
    add(csk_for_10_flat_head_machine_screw_100.mirror(Plane(origin=(2.08e-15, 0, -95.24999999999999), x_dir=(1, 0, 0), z_dir=(0, 0, -1))), mode=Mode.SUBTRACT)


solid = cut_extrude1_piece_1_1.part
